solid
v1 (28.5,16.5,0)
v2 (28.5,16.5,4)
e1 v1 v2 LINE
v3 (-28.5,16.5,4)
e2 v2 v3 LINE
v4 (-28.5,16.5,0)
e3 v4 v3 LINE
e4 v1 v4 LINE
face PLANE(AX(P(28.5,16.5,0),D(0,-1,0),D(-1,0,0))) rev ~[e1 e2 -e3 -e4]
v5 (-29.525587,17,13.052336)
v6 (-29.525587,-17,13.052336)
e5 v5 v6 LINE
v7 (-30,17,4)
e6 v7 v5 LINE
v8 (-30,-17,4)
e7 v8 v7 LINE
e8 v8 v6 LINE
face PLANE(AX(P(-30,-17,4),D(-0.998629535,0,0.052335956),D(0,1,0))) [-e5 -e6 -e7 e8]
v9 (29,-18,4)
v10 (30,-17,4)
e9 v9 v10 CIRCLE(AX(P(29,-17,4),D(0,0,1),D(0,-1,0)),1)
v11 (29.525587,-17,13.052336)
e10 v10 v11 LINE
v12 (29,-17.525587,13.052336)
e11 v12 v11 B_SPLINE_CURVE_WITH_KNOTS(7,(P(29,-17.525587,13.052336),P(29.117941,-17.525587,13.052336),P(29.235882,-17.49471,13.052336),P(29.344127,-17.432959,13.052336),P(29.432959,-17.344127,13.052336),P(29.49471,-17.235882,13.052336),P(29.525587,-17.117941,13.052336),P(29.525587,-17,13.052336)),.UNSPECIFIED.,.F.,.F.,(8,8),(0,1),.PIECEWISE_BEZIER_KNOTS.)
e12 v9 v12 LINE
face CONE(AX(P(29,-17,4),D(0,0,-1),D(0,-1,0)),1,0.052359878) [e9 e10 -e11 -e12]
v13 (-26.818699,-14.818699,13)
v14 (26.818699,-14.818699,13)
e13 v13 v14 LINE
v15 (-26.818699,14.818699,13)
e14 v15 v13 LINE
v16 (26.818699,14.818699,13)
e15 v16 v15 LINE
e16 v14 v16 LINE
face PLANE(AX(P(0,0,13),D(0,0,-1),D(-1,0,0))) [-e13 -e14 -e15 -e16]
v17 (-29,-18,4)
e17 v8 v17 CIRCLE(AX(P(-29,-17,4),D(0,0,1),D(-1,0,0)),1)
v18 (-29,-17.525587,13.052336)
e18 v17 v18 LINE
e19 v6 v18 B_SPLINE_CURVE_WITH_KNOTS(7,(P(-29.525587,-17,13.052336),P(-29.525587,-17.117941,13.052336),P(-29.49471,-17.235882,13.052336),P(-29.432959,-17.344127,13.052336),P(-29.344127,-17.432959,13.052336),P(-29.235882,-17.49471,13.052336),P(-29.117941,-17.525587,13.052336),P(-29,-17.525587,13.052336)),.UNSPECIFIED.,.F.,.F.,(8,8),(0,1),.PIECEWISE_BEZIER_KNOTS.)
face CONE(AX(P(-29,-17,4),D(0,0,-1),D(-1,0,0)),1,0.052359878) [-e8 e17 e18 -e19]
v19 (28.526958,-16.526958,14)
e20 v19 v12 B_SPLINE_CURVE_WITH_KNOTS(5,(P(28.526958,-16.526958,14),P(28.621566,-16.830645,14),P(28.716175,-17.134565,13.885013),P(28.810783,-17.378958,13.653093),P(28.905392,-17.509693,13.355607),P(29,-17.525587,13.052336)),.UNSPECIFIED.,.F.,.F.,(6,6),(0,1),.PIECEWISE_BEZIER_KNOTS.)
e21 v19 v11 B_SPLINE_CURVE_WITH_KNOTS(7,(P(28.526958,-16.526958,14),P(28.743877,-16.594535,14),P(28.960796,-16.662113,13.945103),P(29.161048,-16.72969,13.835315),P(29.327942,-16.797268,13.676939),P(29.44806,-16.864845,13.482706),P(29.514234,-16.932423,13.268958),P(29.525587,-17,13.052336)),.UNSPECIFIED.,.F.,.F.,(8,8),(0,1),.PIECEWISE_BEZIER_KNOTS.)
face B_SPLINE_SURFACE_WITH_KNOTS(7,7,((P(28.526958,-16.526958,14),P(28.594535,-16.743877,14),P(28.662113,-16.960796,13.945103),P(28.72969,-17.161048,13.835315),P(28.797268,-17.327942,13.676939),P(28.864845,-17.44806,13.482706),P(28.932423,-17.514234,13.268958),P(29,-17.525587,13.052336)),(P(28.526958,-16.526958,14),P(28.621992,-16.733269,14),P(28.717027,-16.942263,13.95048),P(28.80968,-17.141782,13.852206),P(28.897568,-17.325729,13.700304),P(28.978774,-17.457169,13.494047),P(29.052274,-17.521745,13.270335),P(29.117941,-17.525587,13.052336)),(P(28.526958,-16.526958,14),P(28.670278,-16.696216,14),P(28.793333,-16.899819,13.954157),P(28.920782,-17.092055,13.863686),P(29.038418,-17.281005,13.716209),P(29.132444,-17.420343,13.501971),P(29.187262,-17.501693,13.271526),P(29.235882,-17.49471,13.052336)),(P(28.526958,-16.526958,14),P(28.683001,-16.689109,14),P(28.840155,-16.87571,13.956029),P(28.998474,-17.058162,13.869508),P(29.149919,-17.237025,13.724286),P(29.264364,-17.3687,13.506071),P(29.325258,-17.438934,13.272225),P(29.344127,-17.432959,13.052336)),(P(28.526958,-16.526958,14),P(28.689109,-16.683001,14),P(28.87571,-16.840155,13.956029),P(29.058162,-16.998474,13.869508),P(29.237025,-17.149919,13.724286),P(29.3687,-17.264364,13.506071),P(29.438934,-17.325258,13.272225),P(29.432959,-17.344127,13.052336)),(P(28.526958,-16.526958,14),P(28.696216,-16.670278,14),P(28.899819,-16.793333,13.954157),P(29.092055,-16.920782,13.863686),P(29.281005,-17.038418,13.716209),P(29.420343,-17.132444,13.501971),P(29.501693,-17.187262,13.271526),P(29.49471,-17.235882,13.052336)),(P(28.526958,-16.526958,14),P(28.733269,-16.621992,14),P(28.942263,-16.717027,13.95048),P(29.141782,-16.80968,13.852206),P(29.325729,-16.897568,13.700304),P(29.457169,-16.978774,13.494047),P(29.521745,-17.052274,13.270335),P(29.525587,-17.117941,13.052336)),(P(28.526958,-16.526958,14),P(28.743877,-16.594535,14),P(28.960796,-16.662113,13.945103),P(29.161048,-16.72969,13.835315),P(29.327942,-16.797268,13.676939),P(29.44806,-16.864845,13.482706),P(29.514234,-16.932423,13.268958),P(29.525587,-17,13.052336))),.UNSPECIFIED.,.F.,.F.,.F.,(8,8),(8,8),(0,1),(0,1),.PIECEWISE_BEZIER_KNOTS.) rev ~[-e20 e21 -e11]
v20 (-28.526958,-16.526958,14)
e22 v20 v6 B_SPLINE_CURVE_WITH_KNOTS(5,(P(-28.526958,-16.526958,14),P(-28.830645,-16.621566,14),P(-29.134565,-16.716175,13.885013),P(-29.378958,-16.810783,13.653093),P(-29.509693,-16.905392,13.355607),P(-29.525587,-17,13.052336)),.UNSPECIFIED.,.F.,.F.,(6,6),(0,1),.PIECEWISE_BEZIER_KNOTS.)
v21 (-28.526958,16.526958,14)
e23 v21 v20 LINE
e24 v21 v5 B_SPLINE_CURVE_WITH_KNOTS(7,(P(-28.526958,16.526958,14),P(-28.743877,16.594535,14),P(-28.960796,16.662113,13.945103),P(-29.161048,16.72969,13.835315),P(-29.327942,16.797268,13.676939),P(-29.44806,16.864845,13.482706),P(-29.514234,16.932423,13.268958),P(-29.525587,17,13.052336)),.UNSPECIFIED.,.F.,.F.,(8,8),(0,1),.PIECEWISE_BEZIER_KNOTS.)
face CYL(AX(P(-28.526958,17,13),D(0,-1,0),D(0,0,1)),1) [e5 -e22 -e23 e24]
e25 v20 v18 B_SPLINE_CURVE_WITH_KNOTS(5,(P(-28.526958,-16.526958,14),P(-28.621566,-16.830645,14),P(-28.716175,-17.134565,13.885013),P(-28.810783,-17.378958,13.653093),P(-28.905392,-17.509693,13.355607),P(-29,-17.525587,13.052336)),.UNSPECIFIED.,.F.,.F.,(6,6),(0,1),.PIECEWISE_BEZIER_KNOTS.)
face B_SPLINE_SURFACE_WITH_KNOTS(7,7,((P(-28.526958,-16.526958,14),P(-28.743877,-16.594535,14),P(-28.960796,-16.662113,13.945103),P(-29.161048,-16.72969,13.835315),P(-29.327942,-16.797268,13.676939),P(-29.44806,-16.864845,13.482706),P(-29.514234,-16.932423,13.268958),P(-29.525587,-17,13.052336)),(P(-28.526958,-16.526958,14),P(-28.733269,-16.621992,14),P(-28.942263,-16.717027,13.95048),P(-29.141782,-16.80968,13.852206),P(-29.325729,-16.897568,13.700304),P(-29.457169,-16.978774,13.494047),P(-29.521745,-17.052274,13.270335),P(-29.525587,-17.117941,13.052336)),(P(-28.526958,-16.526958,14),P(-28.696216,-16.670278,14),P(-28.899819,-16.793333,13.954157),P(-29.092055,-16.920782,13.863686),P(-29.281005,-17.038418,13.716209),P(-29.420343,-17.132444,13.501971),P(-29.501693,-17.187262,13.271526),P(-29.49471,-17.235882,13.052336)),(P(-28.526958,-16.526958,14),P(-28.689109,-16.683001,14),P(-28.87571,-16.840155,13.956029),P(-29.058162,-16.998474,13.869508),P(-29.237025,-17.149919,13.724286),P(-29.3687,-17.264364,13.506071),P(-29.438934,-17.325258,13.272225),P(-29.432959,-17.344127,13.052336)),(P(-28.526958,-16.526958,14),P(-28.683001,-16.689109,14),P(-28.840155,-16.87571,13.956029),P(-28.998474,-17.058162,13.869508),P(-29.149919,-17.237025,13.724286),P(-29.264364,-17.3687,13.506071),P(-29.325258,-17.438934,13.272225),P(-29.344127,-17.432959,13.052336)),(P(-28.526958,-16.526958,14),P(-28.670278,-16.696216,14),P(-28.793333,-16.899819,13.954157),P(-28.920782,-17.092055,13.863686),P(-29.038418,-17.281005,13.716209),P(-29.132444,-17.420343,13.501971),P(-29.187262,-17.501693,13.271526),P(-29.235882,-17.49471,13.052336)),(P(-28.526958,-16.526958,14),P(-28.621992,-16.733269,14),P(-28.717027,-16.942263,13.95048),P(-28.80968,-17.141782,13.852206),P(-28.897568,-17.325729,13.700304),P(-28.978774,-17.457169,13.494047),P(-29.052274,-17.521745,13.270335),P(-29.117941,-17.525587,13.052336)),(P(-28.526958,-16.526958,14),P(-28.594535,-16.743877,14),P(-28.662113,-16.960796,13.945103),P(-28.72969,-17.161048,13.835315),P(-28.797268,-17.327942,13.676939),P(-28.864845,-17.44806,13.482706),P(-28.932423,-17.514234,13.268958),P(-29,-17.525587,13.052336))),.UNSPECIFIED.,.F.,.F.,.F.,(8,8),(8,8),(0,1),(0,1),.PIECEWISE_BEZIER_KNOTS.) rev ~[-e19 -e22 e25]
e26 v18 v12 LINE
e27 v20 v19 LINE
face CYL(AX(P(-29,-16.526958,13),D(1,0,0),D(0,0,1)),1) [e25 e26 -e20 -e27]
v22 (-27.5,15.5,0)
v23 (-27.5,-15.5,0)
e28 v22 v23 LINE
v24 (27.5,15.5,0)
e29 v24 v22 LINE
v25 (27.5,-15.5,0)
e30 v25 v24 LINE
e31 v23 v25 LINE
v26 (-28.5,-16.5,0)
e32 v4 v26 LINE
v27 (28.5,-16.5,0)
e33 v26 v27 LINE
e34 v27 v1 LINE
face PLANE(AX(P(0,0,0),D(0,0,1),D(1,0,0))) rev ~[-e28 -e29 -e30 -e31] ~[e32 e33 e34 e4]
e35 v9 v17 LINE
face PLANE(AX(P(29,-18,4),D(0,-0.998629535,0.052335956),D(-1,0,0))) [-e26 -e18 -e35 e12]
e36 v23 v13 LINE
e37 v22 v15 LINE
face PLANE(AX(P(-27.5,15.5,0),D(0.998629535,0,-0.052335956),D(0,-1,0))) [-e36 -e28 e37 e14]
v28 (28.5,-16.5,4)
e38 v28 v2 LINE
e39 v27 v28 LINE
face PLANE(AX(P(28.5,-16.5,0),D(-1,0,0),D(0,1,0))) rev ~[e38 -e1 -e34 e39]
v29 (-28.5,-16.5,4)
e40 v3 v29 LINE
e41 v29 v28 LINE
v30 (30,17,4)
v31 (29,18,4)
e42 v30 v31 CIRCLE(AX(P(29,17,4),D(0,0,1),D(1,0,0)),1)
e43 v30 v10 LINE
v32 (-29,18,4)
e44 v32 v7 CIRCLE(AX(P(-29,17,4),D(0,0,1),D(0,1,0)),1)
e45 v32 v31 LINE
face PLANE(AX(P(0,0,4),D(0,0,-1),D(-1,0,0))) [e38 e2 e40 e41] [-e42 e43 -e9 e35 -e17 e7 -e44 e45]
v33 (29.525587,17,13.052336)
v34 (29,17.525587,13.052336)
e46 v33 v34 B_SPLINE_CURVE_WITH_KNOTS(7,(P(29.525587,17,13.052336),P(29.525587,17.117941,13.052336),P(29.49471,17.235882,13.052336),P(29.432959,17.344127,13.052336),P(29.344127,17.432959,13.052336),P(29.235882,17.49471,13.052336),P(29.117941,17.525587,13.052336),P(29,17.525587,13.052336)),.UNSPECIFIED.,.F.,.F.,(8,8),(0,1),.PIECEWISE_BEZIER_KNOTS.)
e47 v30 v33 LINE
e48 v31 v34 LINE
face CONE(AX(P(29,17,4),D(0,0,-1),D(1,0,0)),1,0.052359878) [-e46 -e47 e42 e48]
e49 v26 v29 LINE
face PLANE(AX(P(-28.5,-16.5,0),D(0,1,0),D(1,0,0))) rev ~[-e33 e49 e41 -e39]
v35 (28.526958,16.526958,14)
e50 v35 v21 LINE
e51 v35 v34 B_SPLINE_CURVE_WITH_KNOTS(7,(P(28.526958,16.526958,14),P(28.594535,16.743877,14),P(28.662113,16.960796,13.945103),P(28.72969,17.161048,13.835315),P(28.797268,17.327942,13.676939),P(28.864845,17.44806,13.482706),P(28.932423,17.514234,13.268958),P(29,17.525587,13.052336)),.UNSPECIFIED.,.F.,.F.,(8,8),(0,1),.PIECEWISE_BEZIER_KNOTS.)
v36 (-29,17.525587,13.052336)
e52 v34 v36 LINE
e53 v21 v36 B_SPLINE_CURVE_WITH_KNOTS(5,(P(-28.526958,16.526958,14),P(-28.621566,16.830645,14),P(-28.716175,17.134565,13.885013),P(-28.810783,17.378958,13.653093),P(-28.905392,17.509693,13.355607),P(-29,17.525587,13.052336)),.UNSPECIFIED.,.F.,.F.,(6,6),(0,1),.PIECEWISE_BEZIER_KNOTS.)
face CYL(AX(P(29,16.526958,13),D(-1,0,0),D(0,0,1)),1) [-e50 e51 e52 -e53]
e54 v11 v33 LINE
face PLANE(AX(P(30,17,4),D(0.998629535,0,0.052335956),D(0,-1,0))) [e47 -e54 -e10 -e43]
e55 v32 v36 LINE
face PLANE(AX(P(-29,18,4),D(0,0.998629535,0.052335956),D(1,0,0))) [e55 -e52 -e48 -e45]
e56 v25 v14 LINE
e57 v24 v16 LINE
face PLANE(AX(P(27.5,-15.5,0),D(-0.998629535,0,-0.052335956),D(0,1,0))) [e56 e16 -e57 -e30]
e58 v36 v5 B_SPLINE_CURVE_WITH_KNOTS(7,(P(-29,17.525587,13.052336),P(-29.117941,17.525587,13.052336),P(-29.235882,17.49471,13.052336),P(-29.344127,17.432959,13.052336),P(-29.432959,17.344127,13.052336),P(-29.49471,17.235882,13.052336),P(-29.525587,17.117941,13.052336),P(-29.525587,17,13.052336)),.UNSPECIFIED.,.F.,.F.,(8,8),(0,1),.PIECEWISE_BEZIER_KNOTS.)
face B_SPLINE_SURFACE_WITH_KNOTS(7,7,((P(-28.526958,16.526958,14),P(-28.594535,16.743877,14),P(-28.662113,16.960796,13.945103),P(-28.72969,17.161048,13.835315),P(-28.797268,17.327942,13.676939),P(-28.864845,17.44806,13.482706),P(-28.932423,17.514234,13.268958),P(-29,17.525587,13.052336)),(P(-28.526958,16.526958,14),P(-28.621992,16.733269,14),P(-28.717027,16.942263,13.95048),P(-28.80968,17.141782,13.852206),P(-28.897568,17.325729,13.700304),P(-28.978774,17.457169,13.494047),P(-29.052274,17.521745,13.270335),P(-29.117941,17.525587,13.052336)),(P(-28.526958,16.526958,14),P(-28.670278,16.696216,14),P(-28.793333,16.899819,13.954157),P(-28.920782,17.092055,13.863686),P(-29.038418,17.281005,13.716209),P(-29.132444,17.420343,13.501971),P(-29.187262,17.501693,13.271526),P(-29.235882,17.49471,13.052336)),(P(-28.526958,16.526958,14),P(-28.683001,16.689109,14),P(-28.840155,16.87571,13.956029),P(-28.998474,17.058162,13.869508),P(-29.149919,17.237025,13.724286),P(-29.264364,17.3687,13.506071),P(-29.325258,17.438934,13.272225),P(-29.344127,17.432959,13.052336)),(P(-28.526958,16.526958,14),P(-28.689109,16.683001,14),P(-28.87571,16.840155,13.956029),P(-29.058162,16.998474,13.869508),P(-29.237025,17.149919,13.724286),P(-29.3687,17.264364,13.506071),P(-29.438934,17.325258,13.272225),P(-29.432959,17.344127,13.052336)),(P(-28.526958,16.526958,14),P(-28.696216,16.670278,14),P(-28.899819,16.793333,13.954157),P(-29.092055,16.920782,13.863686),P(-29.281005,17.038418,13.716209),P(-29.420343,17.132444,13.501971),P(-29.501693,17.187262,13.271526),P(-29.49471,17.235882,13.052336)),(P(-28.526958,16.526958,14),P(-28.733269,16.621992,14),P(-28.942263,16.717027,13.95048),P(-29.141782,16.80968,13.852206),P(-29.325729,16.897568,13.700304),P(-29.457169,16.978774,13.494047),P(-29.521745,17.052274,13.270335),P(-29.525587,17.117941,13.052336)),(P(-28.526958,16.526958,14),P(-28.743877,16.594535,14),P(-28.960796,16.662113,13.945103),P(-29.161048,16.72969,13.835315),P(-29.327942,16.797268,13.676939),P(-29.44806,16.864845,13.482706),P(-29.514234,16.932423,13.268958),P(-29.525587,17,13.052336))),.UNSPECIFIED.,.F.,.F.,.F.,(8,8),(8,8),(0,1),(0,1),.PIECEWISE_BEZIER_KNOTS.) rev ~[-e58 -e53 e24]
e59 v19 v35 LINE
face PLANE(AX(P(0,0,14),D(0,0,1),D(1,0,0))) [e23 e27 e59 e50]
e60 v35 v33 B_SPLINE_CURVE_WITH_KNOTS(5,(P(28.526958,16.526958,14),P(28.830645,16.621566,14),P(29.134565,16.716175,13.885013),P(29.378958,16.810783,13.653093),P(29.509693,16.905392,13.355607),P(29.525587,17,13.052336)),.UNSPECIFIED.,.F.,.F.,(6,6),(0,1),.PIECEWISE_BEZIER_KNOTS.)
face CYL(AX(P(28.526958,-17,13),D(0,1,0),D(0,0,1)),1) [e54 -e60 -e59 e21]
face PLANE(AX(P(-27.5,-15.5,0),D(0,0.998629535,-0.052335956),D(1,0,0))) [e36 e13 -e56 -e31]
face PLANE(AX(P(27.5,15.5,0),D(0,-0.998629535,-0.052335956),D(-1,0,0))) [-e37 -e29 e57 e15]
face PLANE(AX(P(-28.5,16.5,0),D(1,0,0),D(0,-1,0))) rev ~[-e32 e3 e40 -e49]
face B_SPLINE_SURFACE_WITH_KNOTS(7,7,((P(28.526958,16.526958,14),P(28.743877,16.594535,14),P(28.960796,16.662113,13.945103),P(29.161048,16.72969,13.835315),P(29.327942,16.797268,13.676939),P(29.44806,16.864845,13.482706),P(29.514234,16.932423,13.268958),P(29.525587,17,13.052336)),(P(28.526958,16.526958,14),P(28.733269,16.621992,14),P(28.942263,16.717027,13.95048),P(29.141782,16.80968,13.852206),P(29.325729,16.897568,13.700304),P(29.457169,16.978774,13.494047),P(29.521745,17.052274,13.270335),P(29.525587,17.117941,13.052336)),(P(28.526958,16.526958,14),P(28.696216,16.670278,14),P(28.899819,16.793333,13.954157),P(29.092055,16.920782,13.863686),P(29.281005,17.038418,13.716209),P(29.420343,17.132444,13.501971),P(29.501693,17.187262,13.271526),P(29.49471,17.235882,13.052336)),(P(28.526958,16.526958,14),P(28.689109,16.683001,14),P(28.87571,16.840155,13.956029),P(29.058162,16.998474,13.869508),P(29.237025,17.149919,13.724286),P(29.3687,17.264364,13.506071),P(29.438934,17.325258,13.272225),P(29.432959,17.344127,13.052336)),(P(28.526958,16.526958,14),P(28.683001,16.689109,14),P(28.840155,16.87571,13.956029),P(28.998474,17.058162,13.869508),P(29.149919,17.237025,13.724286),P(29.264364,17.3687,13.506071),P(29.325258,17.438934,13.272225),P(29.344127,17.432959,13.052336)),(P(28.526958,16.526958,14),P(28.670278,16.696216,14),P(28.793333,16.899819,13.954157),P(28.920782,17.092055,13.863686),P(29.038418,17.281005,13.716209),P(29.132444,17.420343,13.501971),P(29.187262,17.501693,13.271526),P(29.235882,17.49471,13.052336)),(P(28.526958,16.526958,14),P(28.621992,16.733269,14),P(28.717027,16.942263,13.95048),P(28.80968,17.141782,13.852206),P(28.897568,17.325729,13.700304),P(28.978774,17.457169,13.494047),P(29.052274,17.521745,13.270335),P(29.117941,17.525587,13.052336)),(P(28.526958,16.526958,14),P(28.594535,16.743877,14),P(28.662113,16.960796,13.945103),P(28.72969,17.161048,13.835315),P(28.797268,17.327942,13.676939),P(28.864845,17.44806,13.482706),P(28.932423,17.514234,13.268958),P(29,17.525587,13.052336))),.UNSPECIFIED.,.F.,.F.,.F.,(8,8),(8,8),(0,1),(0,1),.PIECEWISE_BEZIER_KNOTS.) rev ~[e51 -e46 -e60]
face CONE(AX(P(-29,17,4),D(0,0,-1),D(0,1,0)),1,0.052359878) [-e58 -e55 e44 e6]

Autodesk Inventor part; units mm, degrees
ref_plane "YZ Plane" through (0, 0, 0) normal (1, 0, 0) x (0, 1, 0)
ref_plane "XZ Plane" through (0, 0, 0) normal (0, 1, 0) x (-1, 0, 0)
ref_plane "XY Plane" through (0, 0, 0) normal (0, 0, 1) x (1, 0, 0)
sketch "Эскиз1" plane through (0, 0, 0) normal (0, 0, 1) x (1, 0, 0)
  line L0 (-29, 18) -> (29, 18)
  line L1 (30, 17) -> (30, -17)
  line L2 (29, -18) -> (-29, -18)
  line L3 (-30, -17) -> (-30, 17)
  arc A0 (-29, 18) -> (-30, 17) centre (-29, 17) ccw
  arc A1 (-30, -17) -> (-29, -18) centre (-29, -17) ccw
  arc A2 (29, -18) -> (30, -17) centre (29, -17) ccw
  arc A3 (30, 17) -> (29, 18) centre (29, 17) ccw
  point P0 (0, 0)
  point P1 (-30, 18)
  point P2 (30, 18)
  point P3 (-30, -18)
  dimension "d0" = 60
  dimension "d1" = 36
  dimension "d2" = 18
  dimension "d3" = 30
  dimension "d4" = 1
extrude "Выдавливание1" add sketch "Эскиз1" along normal blind 4
sketch "Эскиз3" plane through (0, 0, 4) normal (0, 0, 1) x (1, 0, 0)
  line L0 (-29, 18) -> (29, 18)
  line L1 (30, 17) -> (30, -17)
  line L2 (29, -18) -> (-29, -18)
  line L3 (-30, -17) -> (-30, 17)
  line L4 (30, -17) -> (30, 17) projected
  line L5 (-29, -18) -> (29, -18) projected
  line L6 (-30, 17) -> (-30, -17) projected
  line L7 (29, 18) -> (-29, 18) projected
  arc A0 (-29, 18) -> (-30, 17) centre (-29, 17) ccw
  arc A1 (-30, -17) -> (-29, -18) centre (-29, -17) ccw
  arc A2 (29, -18) -> (30, -17) centre (29, -17) ccw
  arc A3 (30, 17) -> (29, 18) centre (29, 17) ccw
  point P0 (0, 0)
  dimension "d7" = 0
  dimension "d8" = 0
  dimension "d9" = 0
  dimension "d10" = 0
  dimension "d11" = 1
extrude "Выдавливание2" add sketch "Эскиз3" along normal blind 10 draft -3
sketch "Эскиз4" plane through (0, 0, 0) normal (0, 0, -1) x (-1, 0, 0)
  line L0 (-27.5, 15.5) -> (27.5, 15.5)
  line L1 (27.5, 15.5) -> (27.5, -15.5)
  line L2 (27.5, -15.5) -> (-27.5, -15.5)
  line L3 (-27.5, -15.5) -> (-27.5, 15.5)
  point P0 (0, 0)
  dimension "d14" = 15.5
  dimension "d15" = 31
  dimension "d16" = 27.5
  dimension "d17" = 55
extrude "Выдавливание3" cut sketch "Эскиз4" against normal blind 13 draft -3
sketch "Эскиз5" plane through (0, 0, 0) normal (0, 0, -1) x (-1, 0, 0)
  line L0 (-28.5, 16.5) -> (28.5, 16.5)
  line L1 (28.5, 16.5) -> (28.5, -16.5)
  line L2 (28.5, -16.5) -> (-28.5, -16.5)
  line L3 (-28.5, -16.5) -> (-28.5, 16.5)
  line L4 (-29, 18) -> (29, 18) projected
  line L5 (-30, -17) -> (-30, 17) projected
  line L6 (29, -18) -> (-29, -18) projected
  line L7 (30, 17) -> (30, -17) projected
  line L8 (-29, 18) -> (29, 18)
  line L9 (30, 17) -> (30, -17)
  line L10 (29, -18) -> (-29, -18)
  line L11 (-30, -17) -> (-30, 17)
  arc A0 (-29, 18) -> (-30, 17) centre (-29, 17) ccw
  arc A1 (-30, -17) -> (-29, -18) centre (-29, -17) ccw
  arc A2 (29, -18) -> (30, -17) centre (29, -17) ccw
  arc A3 (30, 17) -> (29, 18) centre (29, 17) ccw
  point P0 (0, 0)
  point P1 (29, 18)
  dimension "d20" = 1.5
  dimension "d21" = 1.5
  dimension "d22" = 1.5
  dimension "d23" = 1.5
  dimension "d24" = 0
  dimension "d25" = 0
  dimension "d26" = 0
  dimension "d27" = 0
  dimension "d28" = 1
extrude "Выдавливание4" cut sketch "Эскиз5" against normal blind 4
fillet "Сопряжение1" radius 1 8 edges at (-29.3365, -17.3365, 14) (-29.4759, 0, 14) (-29.3365, 17.3365, 14) (0, 17.4759, 14) (29.3365, 17.3365, 14) (29.4759, 0, 14) (29.3365, -17.3365, 14) (0, -17.4759, 14)
properties part number "case_up" material "Пластик АБС"
